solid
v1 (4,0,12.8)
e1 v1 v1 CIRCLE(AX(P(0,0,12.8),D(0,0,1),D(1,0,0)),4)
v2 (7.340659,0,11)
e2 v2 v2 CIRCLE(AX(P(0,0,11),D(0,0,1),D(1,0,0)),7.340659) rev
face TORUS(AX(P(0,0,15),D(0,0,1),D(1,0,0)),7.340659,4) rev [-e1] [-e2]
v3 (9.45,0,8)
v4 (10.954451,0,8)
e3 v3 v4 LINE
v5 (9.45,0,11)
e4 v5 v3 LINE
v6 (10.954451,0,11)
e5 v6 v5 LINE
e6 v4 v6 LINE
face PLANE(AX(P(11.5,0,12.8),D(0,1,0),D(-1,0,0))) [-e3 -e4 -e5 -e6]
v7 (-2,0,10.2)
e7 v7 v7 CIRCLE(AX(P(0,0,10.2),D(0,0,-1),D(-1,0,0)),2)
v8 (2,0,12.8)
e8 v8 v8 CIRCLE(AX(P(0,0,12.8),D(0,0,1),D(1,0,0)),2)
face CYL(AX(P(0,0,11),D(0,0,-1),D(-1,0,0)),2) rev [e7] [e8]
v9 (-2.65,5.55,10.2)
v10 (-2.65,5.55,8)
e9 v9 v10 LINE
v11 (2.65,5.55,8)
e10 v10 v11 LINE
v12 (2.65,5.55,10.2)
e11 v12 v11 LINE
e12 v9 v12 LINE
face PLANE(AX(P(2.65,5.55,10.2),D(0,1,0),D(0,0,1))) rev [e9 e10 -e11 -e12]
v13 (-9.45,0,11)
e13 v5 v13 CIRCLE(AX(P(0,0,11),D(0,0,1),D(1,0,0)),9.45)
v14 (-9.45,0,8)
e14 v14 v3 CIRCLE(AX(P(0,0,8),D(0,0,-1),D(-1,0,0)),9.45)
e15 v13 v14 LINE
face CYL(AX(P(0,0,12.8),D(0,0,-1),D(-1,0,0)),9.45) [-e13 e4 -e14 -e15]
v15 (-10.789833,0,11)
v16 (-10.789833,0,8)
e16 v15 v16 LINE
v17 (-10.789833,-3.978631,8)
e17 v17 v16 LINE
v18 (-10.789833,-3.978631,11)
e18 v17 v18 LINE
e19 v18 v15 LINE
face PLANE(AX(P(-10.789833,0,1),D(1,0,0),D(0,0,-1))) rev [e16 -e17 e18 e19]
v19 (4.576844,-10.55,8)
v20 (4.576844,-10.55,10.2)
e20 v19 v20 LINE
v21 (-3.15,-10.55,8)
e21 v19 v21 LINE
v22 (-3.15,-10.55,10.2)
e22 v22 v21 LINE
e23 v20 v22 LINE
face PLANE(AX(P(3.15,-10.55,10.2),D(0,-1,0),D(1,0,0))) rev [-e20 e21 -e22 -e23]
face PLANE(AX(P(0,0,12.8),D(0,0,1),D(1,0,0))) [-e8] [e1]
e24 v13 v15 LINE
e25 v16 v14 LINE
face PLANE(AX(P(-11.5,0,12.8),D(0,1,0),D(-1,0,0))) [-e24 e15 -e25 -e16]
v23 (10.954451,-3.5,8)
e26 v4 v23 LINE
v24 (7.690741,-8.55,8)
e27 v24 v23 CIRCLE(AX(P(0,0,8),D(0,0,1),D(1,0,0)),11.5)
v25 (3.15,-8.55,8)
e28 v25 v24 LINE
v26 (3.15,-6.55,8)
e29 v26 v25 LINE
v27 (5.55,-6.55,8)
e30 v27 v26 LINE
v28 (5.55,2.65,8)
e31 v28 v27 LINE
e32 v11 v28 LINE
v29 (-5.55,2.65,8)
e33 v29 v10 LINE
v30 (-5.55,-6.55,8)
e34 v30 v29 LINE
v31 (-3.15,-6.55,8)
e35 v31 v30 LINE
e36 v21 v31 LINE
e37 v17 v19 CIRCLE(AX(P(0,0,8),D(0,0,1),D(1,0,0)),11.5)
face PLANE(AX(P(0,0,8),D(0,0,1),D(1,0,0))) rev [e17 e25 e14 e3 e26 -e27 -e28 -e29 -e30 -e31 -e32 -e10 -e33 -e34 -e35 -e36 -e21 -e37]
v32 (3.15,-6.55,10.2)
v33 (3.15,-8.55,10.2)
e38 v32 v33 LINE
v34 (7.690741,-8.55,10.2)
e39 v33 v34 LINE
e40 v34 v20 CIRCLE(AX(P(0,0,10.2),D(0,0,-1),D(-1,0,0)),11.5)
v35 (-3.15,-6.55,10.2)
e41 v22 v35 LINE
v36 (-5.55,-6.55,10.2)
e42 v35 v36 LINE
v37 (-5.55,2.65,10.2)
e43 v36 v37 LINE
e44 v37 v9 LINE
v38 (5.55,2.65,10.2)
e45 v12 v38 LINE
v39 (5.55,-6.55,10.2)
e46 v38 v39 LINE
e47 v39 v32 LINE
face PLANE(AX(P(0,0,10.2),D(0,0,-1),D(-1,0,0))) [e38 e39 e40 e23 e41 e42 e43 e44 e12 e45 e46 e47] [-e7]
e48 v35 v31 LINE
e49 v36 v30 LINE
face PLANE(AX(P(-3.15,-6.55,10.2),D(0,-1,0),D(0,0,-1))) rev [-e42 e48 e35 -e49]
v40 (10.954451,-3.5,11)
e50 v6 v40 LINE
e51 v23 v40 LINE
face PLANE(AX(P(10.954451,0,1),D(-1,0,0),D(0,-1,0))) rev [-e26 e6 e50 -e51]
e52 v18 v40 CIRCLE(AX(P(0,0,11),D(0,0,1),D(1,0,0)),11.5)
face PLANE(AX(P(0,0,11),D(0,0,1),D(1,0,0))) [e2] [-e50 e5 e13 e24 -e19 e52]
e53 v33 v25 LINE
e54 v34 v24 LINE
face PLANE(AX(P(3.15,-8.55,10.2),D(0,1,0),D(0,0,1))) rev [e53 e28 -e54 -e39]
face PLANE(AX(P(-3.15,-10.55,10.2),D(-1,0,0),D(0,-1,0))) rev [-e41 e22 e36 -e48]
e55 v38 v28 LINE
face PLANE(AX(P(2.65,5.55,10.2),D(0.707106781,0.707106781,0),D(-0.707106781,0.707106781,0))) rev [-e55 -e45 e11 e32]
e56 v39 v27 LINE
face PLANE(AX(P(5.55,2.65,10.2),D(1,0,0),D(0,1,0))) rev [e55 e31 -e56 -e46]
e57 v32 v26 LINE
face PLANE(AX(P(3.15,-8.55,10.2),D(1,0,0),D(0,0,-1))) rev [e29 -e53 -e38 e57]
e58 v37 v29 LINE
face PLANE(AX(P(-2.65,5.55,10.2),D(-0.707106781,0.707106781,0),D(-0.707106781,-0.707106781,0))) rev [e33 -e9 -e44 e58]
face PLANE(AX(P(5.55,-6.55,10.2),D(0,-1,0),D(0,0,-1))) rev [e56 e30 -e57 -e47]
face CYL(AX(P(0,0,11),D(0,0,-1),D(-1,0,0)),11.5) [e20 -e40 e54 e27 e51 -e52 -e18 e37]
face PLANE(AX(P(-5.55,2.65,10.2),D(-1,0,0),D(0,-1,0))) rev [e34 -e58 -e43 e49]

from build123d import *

# Parameters (mm, degrees)
BOSS_EXTRUDE1_DEPTH = 15.3
SKETCH2_R           = 9.3
CUT_EXTRUDE1_DEPTH  = 3.1
BOSS_EXTRUDE2_START = 8
BOSS_EXTRUDE2_DEPTH = 8
BOSS_EXTRUDE3_START = 3
SKETCH4_R           = 2
BOSS_EXTRUDE3_DEPTH = 3
BOSS_EXTRUDE4_START = 1.8
SKETCH5_R           = 4
SKETCH5_R_2         = 2
BOSS_EXTRUDE4_DEPTH = 1.8
FILLET1_R           = 4
FILLET2_R           = 1
CUT_EXTRUDE2_START  = -2.2
SKETCH7_R           = 2
CUT_EXTRUDE2_DEPTH  = 2.2
SKETCH9_R           = 21.205552102
CUT_EXTRUDE4_DEPTH  = 23.3
SKETCH8_W           = 42.45562683
SKETCH8_H           = 26.950518874
CUT_EXTRUDE5_DEPTH  = 21.71696165
CUT_EXTRUDE6_DEPTH  = 10


with BuildPart() as part:
    # Sketch1 → Boss-Extrude1 (new body)
    with BuildSketch(Plane.XY):
        with BuildLine():
            Line((-8.55, 0), (-16.55, 0))
            Line((-16.55, 0), (-16.55, 3.5))
            Line((-16.55, 3.5), (-10.95445115, 3.5))
            ThreePointArc((-10.95445115, 3.5), (0, 11.5), (10.95445115, 3.5))
            Line((10.95445115, 3.5), (16.55, 3.5))
            Line((16.55, 3.5), (16.55, 0))
            Line((16.55, 0), (8.55, 0))
            ThreePointArc((8.55, 0), (0, 8.55), (-8.55, 0))
        make_face()
    extrude(amount=-BOSS_EXTRUDE1_DEPTH)

    # Sketch2 → Cut-Extrude1 (cut)
    with BuildSketch(Plane.XY.offset(-6.3)):
        Circle(SKETCH2_R)
    extrude(amount=-CUT_EXTRUDE1_DEPTH, mode=Mode.SUBTRACT)

    # Sketch3 → Boss-Extrude2 (add)
    with BuildSketch(Plane.XY.offset(BOSS_EXTRUDE2_START)):
        with BuildLine():
            Line((-10.25, 0), (-16.55, 0))
            Line((-16.55, 0), (-16.55, 3.5))
            Line((-16.55, 3.5), (-10.95445115, 3.5))
            ThreePointArc((-10.95445115, 3.5), (0, 11.5), (10.95445115, 3.5))
            Line((10.95445115, 3.5), (16.55, 3.5))
            Line((16.55, 3.5), (16.55, 0))
            Line((16.55, 0), (10.25, 0))
            ThreePointArc((10.25, 0), (0, 10.25), (-10.25, 0))
        make_face()
    extrude(amount=-BOSS_EXTRUDE2_DEPTH)

    # Sketch4 → Boss-Extrude3 (add)
    with BuildSketch(Plane.XY.offset(8).offset(BOSS_EXTRUDE3_START)):
        with BuildLine():
            Line((-11.5, 0), (-16.55, 0))
            Line((-16.55, 0), (-16.55, 3.5))
            Line((-16.55, 3.5), (-10.95445115, 3.5))
            ThreePointArc((-10.95445115, 3.5), (0, 11.5), (10.95445115, 3.5))
            Line((10.95445115, 3.5), (16.55, 3.5))
            Line((16.55, 3.5), (16.55, 0))
            Line((16.55, 0), (11.5, 0))
            ThreePointArc((11.5, 0), (0, -11.5), (-11.5, 0))
        make_face()
        Circle(SKETCH4_R, mode=Mode.SUBTRACT)
    extrude(amount=-BOSS_EXTRUDE3_DEPTH)

    # Sketch5 → Boss-Extrude4 (add)
    with BuildSketch(Plane.XY.offset(11).offset(BOSS_EXTRUDE4_START)):
        Circle(SKETCH5_R)
        Circle(SKETCH5_R_2, mode=Mode.SUBTRACT)
    extrude(amount=-BOSS_EXTRUDE4_DEPTH)

    # Fillet1
    # the kernel refuses this fillet: 4 mm, written as the material it adds along each edge
    with BuildSketch(Plane(origin=(0, 0, 11), x_dir=(1, 0, 0), z_dir=(0, -1, 0))) as fillet1_piece_1:
        with BuildLine():
            CenterArc((7.340658618, 4), FILLET1_R, 213.367012969, 56.632987031)
            Line((7.340658618, 0), (7.340658618, -0.08))
            Line((7.340658618, -0.08), (4, -0.08))
            Line((4, -0.08), (3.92, 0))
            ThreePointArc((3.92, 0), (3.92, 0.9), (3.933186828, 1.756))
            Line((3.933186828, 1.756), (4, 1.8))
        make_face()
    revolve(axis=Axis((0, 0, 11), (0, 0, 1)))

    # Fillet2
    fillet2_edges = [part.edges().sort_by_distance(p)[0] for p in [
        (0, 10.25, 8),
    ]]
    fillet(fillet2_edges, radius=FILLET2_R)

    # Sketch7 → Cut-Extrude2 (cut)
    with BuildSketch(Plane(origin=(0, 0, 8), x_dir=(-1, 0, 0), z_dir=(0, 0, -1)).offset(CUT_EXTRUDE2_START)):
        Polygon((5.55, 2.65), (5.55, -6.55), (3.15, -6.55), (3.15, -10.55), (-3.15, -10.55), (-6.775322586, -10.55), (-8.767406073, -8.55), (-3.15, -8.55), (-3.15, -6.55), (-5.55, -6.55), (-5.55, 2.65), (-2.65, 5.55), (2.65, 5.55), align=None)
        Circle(SKETCH7_R, mode=Mode.SUBTRACT)
    extrude(amount=CUT_EXTRUDE2_DEPTH, mode=Mode.SUBTRACT)

    # Sketch9 → Cut-Extrude4 (cut)
    with BuildSketch(Plane(origin=(0, 0, 8), x_dir=(-1, 0, 0), z_dir=(0, 0, -1))):
        Circle(SKETCH9_R)
    extrude(amount=CUT_EXTRUDE4_DEPTH, mode=Mode.SUBTRACT)

    # Sketch8 → Cut-Extrude5 (cut, through all)
    with BuildSketch(Plane(origin=(0, 0, 8), x_dir=(-1, 0, 0), z_dir=(0, 0, -1))):
        Rectangle(SKETCH8_W, SKETCH8_H)
        with BuildLine():
            Line((11.5, 0), (9.45, 0))
            ThreePointArc((9.45, 0), (0, 9.45), (-9.45, 0))
            Line((-9.45, 0), (-11.5, 0))
            ThreePointArc((-11.5, 0), (0, -11.5), (11.5, 0))
        make_face(mode=Mode.SUBTRACT)
    extrude(amount=-CUT_EXTRUDE5_DEPTH, mode=Mode.SUBTRACT)

    # Sketch10 → Cut-Extrude6 (cut)
    with BuildSketch(Plane.XY.offset(11)):
        with BuildLine():
            Line((-10.789833042, 0), (-10.789833042, -3.978630786))
            ThreePointArc((-10.789833042, -3.978630786), (-11.321066204, -2.020757286), (-11.5, 0))
            Line((-11.5, 0), (-10.789833042, 0))
        make_face()
        with BuildLine():
            Line((10.95445115, 0), (10.95445115, -3.5))
            ThreePointArc((10.95445115, -3.5), (11.362794292, -1.771131245), (11.5, 0))
            Line((11.5, 0), (10.95445115, 0))
        make_face()
    extrude(amount=-CUT_EXTRUDE6_DEPTH, mode=Mode.SUBTRACT)


solid = part.part
